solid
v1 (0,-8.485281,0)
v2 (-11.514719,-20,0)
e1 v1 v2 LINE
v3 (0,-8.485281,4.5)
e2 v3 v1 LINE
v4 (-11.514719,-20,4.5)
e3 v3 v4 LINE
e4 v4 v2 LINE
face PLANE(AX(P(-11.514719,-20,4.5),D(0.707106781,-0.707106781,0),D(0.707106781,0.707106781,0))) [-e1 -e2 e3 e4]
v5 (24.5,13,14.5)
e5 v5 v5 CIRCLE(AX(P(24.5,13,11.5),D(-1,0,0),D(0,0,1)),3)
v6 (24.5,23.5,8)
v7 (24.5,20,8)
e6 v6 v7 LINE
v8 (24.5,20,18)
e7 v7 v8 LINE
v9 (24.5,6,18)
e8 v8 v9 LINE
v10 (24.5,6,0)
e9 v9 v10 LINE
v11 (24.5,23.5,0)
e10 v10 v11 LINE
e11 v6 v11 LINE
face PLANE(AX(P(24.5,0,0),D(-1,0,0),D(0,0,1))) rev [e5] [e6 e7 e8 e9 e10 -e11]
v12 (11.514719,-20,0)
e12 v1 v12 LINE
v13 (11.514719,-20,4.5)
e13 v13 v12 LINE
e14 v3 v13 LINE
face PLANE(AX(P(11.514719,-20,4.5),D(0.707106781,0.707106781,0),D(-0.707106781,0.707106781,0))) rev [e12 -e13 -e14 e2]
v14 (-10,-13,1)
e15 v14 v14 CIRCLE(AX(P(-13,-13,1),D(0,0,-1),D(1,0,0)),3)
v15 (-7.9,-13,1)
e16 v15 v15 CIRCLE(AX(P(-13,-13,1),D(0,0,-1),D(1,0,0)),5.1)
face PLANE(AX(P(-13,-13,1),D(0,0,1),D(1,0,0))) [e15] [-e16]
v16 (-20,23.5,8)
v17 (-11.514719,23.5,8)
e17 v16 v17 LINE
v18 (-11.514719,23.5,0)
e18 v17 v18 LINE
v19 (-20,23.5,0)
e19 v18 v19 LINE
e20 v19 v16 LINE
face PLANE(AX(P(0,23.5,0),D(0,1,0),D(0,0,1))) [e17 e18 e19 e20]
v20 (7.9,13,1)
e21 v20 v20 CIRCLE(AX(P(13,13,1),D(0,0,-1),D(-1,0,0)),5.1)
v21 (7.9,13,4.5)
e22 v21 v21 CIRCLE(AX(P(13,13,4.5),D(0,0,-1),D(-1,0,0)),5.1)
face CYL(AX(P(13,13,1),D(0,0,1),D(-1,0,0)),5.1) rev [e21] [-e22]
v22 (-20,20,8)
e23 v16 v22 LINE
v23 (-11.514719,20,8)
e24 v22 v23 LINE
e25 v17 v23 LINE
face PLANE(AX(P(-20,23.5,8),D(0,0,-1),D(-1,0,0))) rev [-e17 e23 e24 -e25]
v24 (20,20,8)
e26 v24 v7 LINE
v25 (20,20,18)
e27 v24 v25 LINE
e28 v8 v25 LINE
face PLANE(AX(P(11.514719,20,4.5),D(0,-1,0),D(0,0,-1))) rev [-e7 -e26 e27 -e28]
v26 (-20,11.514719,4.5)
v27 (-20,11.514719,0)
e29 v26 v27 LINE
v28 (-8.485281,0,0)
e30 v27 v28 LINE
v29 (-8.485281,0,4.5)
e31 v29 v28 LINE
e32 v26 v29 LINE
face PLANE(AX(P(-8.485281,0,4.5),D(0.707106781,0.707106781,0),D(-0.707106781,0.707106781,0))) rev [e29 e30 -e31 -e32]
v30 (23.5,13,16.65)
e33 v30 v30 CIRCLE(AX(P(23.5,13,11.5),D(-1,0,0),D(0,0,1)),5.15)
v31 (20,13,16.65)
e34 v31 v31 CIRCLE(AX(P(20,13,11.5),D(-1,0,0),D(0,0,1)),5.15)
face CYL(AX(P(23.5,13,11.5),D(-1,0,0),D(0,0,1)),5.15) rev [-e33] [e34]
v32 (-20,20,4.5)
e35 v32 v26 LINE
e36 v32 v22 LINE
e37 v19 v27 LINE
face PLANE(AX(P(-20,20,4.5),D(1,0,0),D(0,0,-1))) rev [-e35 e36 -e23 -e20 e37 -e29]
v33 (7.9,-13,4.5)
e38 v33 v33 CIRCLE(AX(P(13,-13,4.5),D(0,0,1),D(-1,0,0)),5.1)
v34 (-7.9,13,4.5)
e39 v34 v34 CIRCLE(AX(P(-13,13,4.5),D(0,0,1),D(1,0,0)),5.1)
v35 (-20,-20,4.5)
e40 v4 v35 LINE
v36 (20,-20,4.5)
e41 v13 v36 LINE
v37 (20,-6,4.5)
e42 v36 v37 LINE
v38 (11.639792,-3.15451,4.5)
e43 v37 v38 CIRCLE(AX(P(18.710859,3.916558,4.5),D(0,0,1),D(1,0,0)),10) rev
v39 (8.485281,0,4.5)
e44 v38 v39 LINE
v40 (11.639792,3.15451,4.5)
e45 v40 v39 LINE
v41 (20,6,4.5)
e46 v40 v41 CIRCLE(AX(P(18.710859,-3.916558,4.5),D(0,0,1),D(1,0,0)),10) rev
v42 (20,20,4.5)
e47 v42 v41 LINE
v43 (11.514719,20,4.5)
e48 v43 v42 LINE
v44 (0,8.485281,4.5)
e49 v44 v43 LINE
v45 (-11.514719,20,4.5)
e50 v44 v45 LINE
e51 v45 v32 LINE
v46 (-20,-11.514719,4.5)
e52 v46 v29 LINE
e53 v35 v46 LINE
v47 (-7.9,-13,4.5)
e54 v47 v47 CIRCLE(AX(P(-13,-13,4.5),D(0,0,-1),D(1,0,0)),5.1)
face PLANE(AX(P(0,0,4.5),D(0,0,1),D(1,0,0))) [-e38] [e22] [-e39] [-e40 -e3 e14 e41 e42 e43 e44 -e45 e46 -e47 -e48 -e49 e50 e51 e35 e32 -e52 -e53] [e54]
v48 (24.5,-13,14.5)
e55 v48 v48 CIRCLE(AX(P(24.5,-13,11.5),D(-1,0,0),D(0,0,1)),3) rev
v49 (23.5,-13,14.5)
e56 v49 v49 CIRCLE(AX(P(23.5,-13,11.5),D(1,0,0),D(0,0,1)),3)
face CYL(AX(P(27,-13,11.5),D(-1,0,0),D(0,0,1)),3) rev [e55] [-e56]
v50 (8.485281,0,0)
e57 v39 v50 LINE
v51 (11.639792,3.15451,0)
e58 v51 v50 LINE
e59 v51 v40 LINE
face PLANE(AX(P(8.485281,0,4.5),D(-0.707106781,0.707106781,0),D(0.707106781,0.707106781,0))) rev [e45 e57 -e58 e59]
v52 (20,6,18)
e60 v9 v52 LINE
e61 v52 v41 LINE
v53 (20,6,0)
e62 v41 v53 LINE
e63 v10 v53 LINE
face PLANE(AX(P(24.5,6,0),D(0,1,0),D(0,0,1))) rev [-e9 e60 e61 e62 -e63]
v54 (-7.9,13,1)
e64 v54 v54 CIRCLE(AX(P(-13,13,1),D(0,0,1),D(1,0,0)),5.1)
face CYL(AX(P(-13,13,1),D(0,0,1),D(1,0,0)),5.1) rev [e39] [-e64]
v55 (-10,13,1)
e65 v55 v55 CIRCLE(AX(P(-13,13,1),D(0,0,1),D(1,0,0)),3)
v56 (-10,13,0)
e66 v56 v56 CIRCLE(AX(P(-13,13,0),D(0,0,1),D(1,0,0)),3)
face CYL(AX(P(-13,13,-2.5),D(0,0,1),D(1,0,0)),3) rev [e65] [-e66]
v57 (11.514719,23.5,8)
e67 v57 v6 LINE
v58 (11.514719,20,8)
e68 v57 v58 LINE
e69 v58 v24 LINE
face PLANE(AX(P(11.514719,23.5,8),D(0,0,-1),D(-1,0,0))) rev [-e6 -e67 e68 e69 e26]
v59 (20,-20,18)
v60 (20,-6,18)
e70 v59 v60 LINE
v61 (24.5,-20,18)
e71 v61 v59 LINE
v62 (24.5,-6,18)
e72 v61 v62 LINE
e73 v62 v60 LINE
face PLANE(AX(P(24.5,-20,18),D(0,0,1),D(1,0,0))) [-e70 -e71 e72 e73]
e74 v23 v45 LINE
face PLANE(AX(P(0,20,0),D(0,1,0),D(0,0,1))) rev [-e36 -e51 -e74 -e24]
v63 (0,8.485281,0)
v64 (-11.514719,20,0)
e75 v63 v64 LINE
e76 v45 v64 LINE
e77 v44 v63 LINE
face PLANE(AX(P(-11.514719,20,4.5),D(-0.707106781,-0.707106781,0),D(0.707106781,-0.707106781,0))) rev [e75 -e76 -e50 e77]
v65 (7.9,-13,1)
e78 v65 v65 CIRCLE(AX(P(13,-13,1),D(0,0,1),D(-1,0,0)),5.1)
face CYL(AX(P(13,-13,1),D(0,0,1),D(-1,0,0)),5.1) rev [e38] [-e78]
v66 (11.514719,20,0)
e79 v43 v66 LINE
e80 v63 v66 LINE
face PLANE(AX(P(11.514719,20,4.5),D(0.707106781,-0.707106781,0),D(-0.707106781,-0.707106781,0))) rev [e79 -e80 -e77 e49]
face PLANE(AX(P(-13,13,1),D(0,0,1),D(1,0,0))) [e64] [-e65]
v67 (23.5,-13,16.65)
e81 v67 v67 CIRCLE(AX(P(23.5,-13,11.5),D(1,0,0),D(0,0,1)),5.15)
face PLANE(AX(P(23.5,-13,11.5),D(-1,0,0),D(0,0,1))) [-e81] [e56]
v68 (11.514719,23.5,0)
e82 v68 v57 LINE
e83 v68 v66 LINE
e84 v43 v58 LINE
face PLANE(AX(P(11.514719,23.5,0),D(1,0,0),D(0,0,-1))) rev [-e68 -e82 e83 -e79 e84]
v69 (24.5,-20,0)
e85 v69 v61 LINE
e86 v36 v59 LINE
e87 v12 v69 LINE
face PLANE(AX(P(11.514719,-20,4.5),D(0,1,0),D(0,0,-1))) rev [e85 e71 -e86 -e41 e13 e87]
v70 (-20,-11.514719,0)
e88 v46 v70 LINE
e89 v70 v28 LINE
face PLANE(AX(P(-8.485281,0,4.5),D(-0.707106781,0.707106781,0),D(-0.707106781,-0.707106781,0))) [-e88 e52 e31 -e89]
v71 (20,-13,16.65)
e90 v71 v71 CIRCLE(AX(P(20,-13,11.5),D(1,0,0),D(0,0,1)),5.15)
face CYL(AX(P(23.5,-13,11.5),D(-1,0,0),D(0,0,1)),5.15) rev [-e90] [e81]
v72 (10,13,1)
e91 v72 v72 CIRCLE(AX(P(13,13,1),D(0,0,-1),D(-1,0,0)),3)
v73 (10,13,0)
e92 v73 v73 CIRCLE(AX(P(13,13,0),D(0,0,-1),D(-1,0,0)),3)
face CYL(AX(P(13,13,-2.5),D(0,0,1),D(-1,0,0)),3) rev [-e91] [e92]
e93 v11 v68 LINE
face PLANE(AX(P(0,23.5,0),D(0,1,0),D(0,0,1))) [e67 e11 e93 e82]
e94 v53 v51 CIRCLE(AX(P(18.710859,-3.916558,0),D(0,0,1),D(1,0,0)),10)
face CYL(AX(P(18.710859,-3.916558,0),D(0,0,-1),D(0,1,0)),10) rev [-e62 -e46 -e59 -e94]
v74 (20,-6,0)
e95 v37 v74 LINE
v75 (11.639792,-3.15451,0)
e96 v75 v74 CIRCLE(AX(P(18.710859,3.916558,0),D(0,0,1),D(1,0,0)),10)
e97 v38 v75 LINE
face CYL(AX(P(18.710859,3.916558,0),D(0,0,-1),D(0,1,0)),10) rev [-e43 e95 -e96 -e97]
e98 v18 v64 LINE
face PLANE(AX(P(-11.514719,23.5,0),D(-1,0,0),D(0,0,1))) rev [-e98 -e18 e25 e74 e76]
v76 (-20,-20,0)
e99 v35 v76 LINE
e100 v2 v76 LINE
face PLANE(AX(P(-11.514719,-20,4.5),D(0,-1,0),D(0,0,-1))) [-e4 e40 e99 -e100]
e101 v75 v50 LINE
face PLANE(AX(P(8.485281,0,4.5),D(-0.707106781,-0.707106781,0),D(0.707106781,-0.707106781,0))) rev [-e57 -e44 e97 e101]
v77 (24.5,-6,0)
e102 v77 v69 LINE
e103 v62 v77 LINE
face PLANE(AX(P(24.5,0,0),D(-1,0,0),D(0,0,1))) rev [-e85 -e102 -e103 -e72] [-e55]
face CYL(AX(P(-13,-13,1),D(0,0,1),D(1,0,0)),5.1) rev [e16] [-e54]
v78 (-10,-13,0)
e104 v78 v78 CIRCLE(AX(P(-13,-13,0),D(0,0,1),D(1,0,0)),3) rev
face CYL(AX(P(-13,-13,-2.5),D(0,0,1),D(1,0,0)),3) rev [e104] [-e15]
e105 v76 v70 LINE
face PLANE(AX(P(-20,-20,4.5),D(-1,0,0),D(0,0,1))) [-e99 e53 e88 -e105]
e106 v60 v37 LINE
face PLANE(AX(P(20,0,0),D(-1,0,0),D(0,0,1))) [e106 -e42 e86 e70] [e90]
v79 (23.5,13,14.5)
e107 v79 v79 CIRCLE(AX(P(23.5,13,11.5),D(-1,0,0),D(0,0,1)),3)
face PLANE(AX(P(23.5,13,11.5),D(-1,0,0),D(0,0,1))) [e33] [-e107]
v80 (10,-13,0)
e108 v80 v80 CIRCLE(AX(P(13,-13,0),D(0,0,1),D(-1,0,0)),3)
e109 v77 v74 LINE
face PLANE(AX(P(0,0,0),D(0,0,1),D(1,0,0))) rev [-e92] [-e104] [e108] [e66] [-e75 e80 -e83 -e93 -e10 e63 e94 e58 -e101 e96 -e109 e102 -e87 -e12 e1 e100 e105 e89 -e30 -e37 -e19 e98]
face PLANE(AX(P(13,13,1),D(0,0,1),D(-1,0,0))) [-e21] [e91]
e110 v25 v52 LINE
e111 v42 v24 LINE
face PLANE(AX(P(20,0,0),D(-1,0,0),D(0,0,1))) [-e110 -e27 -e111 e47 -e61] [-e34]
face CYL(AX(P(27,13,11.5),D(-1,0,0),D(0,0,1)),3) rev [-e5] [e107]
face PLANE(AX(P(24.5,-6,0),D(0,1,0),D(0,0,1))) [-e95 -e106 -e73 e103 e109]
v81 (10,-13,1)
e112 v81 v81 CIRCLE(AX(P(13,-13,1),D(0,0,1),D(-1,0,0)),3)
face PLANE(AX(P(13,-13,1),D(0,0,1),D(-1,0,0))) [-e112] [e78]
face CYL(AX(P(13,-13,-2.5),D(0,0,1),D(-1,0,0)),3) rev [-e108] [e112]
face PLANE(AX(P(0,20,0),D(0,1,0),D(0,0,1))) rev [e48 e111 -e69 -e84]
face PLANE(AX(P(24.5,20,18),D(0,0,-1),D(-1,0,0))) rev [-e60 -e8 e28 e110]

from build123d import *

# Parameters (mm, degrees)
RESSALTO_EXTRUS_O1_DEPTH  = 4.5
ESBO_O2_R                 = 5.1
CORTE_EXTRUS_O1_DEPTH     = 3.5
ESBO_O3_R                 = 3
CORTE_EXTRUS_O2_DEPTH     = 3.5
ESPELHAR2_COPY_1_DEPTH    = 4.5
ESPELHAR2_COPY_2_SKETCH_R = 5.1
ESPELHAR2_COPY_2_DEPTH    = 3.5
ESPELHAR2_COPY_3_SKETCH_R = 3
ESPELHAR2_COPY_3_DEPTH    = 3.5
ESBO_O5_W                 = 18
ESBO_O5_H                 = 14
RESSALTO_EXTRUS_O2_DEPTH  = 4.5
ESBO_O6_R                 = 5.15
CORTE_EXTRUS_O3_DEPTH     = 3.5
ESBO_O7_R                 = 3
CORTE_EXTRUS_O4_DEPTH     = 3.5
FILETE1_R                 = 10
ESBO_O8_W                 = 8.485281374
ESBO_O8_H                 = 8
ESBO_O8_W_2               = 12.985281374
RESSALTO_EXTRUS_O3_DEPTH  = 3.5


with BuildPart() as part:
    # Esboço1 → Ressalto-extrusão1 (new body)
    with BuildSketch(Plane.XY):
        Polygon((-8.485281374, 0), (-20, 11.514718626), (-20, 20), (-11.514718626, 20), (0, 8.485281374), (0, 0), align=None)
    ressalto_extrus_o1 = extrude(amount=RESSALTO_EXTRUS_O1_DEPTH)

    # Esboço2 → Corte-extrusão1 (cut)
    with BuildSketch(Plane.XY.offset(4.5)):
        with Locations((-13, 13)):
            Circle(ESBO_O2_R)
    corte_extrus_o1 = extrude(amount=-CORTE_EXTRUS_O1_DEPTH, mode=Mode.SUBTRACT)

    # Esboço3 → Corte-extrusão2 (cut)
    with BuildSketch(Plane.XY.offset(1)):
        with Locations((-13, 13)):
            Circle(ESBO_O3_R)
    corte_extrus_o2 = extrude(amount=-CORTE_EXTRUS_O2_DEPTH, mode=Mode.SUBTRACT)

    # Espelhar1: Ressalto-extrusão1, Corte-extrusão1, Corte-extrusão2 across plane
    add(ressalto_extrus_o1.mirror(Plane(origin=(0, 0, 0), x_dir=(0, 0, 1), z_dir=(1, 0, 0))))
    add(corte_extrus_o1.mirror(Plane(origin=(0, 0, 0), x_dir=(0, 0, 1), z_dir=(1, 0, 0))), mode=Mode.SUBTRACT)
    add(corte_extrus_o2.mirror(Plane(origin=(0, 0, 0), x_dir=(0, 0, 1), z_dir=(1, 0, 0))), mode=Mode.SUBTRACT)

    # Espelhar2: Ressalto-extrusão1, Corte-extrusão1, Corte-extrusão2 across plane
    add(ressalto_extrus_o1.mirror(Plane.ZX))
    add(corte_extrus_o1.mirror(Plane.ZX), mode=Mode.SUBTRACT)
    add(corte_extrus_o2.mirror(Plane.ZX), mode=Mode.SUBTRACT)

    # Espelhar2 copy 1 sketch → Espelhar2 copy 1 (add)
    with BuildSketch(Plane(origin=(0, 0, 0), x_dir=(-1, 0, 0), z_dir=(0, 0, 1))):
        Polygon((-8.485281374, 0), (-20, 11.514718626), (-20, 20), (-11.514718626, 20), (0, 8.485281374), (0, 0), align=None)
    extrude(amount=ESPELHAR2_COPY_1_DEPTH)

    # Espelhar2 copy 2 sketch → Espelhar2 copy 2 (cut)
    with BuildSketch(Plane(origin=(0, 0, 4.5), x_dir=(-1, 0, 0), z_dir=(0, 0, 1))):
        with Locations((-13, 13)):
            Circle(ESPELHAR2_COPY_2_SKETCH_R)
    extrude(amount=-ESPELHAR2_COPY_2_DEPTH, mode=Mode.SUBTRACT)

    # Espelhar2 copy 3 sketch → Espelhar2 copy 3 (cut)
    with BuildSketch(Plane(origin=(0, 0, 1), x_dir=(-1, 0, 0), z_dir=(0, 0, 1))):
        with Locations((-13, 13)):
            Circle(ESPELHAR2_COPY_3_SKETCH_R)
    extrude(amount=-ESPELHAR2_COPY_3_DEPTH, mode=Mode.SUBTRACT)

    # Esboço5 → Ressalto-extrusão2 (add)
    with BuildSketch(Plane(origin=(20, 0, 0), x_dir=(0, 0, -1), z_dir=(1, 0, 0))):
        with Locations((-9, 13)):
            Rectangle(ESBO_O5_W, ESBO_O5_H)
    ressalto_extrus_o2 = extrude(amount=RESSALTO_EXTRUS_O2_DEPTH)

    # Esboço6 → Corte-extrusão3 (cut)
    with BuildSketch(Plane.ZY.offset(-20)):
        with Locations((11.5, 13)):
            Circle(ESBO_O6_R)
    corte_extrus_o3 = extrude(amount=-CORTE_EXTRUS_O3_DEPTH, mode=Mode.SUBTRACT)

    # Esboço7 → Corte-extrusão4 (cut)
    with BuildSketch(Plane.ZY.offset(-23.5)):
        with Locations((11.5, 13)):
            Circle(ESBO_O7_R)
    corte_extrus_o4 = extrude(amount=-CORTE_EXTRUS_O4_DEPTH, mode=Mode.SUBTRACT)

    # Espelhar3: Ressalto-extrusão2, Corte-extrusão3, Corte-extrusão4 across plane
    add(ressalto_extrus_o2.mirror(Plane.ZX))
    add(corte_extrus_o3.mirror(Plane.ZX), mode=Mode.SUBTRACT)
    add(corte_extrus_o4.mirror(Plane.ZX), mode=Mode.SUBTRACT)

    # Filete1
    # the kernel refuses this fillet: 10 mm, written as the material it adds along each edge
    with BuildSketch(Plane(origin=(20, 11.514718626, 0), x_dir=(0, -1, 0), z_dir=(0, 0, 1))) as filete1_piece_1:
        with BuildLine():
            CenterArc((15.431276309, -1.289140686), FILETE1_R, 172.593154991, 52.406845009)
            Line((8.360208498, -8.360208498), (0, 0))
            Line((0, 0), (5.514718626, 0))
        make_face()
    extrude(amount=4.5)
    with BuildSketch(Plane(origin=(20, -11.514718626, 0), x_dir=(-0.7071067811865462, 0.7071067811865488, 0), z_dir=(0, 0, 1))) as filete1_piece_2:
        with BuildLine():
            CenterArc((11.823120241, -10), FILETE1_R, 90, 52.406845009)
            Line((3.899494937, -3.899494937), (0, 0))
            Line((0, 0), (11.823120241, 0))
        make_face()
    extrude(amount=4.5)

    # Esboço8 → Ressalto-extrusão3 (add)
    with BuildSketch(Plane(origin=(0, 20, 0), x_dir=(1, 0, 0), z_dir=(0, 1, 0))):
        with Locations((-15.757359313, -4)):
            Rectangle(ESBO_O8_W, ESBO_O8_H)
        with Locations((18.007359313, -4)):
            Rectangle(ESBO_O8_W_2, ESBO_O8_H)
    extrude(amount=RESSALTO_EXTRUS_O3_DEPTH)


solid = part.part
